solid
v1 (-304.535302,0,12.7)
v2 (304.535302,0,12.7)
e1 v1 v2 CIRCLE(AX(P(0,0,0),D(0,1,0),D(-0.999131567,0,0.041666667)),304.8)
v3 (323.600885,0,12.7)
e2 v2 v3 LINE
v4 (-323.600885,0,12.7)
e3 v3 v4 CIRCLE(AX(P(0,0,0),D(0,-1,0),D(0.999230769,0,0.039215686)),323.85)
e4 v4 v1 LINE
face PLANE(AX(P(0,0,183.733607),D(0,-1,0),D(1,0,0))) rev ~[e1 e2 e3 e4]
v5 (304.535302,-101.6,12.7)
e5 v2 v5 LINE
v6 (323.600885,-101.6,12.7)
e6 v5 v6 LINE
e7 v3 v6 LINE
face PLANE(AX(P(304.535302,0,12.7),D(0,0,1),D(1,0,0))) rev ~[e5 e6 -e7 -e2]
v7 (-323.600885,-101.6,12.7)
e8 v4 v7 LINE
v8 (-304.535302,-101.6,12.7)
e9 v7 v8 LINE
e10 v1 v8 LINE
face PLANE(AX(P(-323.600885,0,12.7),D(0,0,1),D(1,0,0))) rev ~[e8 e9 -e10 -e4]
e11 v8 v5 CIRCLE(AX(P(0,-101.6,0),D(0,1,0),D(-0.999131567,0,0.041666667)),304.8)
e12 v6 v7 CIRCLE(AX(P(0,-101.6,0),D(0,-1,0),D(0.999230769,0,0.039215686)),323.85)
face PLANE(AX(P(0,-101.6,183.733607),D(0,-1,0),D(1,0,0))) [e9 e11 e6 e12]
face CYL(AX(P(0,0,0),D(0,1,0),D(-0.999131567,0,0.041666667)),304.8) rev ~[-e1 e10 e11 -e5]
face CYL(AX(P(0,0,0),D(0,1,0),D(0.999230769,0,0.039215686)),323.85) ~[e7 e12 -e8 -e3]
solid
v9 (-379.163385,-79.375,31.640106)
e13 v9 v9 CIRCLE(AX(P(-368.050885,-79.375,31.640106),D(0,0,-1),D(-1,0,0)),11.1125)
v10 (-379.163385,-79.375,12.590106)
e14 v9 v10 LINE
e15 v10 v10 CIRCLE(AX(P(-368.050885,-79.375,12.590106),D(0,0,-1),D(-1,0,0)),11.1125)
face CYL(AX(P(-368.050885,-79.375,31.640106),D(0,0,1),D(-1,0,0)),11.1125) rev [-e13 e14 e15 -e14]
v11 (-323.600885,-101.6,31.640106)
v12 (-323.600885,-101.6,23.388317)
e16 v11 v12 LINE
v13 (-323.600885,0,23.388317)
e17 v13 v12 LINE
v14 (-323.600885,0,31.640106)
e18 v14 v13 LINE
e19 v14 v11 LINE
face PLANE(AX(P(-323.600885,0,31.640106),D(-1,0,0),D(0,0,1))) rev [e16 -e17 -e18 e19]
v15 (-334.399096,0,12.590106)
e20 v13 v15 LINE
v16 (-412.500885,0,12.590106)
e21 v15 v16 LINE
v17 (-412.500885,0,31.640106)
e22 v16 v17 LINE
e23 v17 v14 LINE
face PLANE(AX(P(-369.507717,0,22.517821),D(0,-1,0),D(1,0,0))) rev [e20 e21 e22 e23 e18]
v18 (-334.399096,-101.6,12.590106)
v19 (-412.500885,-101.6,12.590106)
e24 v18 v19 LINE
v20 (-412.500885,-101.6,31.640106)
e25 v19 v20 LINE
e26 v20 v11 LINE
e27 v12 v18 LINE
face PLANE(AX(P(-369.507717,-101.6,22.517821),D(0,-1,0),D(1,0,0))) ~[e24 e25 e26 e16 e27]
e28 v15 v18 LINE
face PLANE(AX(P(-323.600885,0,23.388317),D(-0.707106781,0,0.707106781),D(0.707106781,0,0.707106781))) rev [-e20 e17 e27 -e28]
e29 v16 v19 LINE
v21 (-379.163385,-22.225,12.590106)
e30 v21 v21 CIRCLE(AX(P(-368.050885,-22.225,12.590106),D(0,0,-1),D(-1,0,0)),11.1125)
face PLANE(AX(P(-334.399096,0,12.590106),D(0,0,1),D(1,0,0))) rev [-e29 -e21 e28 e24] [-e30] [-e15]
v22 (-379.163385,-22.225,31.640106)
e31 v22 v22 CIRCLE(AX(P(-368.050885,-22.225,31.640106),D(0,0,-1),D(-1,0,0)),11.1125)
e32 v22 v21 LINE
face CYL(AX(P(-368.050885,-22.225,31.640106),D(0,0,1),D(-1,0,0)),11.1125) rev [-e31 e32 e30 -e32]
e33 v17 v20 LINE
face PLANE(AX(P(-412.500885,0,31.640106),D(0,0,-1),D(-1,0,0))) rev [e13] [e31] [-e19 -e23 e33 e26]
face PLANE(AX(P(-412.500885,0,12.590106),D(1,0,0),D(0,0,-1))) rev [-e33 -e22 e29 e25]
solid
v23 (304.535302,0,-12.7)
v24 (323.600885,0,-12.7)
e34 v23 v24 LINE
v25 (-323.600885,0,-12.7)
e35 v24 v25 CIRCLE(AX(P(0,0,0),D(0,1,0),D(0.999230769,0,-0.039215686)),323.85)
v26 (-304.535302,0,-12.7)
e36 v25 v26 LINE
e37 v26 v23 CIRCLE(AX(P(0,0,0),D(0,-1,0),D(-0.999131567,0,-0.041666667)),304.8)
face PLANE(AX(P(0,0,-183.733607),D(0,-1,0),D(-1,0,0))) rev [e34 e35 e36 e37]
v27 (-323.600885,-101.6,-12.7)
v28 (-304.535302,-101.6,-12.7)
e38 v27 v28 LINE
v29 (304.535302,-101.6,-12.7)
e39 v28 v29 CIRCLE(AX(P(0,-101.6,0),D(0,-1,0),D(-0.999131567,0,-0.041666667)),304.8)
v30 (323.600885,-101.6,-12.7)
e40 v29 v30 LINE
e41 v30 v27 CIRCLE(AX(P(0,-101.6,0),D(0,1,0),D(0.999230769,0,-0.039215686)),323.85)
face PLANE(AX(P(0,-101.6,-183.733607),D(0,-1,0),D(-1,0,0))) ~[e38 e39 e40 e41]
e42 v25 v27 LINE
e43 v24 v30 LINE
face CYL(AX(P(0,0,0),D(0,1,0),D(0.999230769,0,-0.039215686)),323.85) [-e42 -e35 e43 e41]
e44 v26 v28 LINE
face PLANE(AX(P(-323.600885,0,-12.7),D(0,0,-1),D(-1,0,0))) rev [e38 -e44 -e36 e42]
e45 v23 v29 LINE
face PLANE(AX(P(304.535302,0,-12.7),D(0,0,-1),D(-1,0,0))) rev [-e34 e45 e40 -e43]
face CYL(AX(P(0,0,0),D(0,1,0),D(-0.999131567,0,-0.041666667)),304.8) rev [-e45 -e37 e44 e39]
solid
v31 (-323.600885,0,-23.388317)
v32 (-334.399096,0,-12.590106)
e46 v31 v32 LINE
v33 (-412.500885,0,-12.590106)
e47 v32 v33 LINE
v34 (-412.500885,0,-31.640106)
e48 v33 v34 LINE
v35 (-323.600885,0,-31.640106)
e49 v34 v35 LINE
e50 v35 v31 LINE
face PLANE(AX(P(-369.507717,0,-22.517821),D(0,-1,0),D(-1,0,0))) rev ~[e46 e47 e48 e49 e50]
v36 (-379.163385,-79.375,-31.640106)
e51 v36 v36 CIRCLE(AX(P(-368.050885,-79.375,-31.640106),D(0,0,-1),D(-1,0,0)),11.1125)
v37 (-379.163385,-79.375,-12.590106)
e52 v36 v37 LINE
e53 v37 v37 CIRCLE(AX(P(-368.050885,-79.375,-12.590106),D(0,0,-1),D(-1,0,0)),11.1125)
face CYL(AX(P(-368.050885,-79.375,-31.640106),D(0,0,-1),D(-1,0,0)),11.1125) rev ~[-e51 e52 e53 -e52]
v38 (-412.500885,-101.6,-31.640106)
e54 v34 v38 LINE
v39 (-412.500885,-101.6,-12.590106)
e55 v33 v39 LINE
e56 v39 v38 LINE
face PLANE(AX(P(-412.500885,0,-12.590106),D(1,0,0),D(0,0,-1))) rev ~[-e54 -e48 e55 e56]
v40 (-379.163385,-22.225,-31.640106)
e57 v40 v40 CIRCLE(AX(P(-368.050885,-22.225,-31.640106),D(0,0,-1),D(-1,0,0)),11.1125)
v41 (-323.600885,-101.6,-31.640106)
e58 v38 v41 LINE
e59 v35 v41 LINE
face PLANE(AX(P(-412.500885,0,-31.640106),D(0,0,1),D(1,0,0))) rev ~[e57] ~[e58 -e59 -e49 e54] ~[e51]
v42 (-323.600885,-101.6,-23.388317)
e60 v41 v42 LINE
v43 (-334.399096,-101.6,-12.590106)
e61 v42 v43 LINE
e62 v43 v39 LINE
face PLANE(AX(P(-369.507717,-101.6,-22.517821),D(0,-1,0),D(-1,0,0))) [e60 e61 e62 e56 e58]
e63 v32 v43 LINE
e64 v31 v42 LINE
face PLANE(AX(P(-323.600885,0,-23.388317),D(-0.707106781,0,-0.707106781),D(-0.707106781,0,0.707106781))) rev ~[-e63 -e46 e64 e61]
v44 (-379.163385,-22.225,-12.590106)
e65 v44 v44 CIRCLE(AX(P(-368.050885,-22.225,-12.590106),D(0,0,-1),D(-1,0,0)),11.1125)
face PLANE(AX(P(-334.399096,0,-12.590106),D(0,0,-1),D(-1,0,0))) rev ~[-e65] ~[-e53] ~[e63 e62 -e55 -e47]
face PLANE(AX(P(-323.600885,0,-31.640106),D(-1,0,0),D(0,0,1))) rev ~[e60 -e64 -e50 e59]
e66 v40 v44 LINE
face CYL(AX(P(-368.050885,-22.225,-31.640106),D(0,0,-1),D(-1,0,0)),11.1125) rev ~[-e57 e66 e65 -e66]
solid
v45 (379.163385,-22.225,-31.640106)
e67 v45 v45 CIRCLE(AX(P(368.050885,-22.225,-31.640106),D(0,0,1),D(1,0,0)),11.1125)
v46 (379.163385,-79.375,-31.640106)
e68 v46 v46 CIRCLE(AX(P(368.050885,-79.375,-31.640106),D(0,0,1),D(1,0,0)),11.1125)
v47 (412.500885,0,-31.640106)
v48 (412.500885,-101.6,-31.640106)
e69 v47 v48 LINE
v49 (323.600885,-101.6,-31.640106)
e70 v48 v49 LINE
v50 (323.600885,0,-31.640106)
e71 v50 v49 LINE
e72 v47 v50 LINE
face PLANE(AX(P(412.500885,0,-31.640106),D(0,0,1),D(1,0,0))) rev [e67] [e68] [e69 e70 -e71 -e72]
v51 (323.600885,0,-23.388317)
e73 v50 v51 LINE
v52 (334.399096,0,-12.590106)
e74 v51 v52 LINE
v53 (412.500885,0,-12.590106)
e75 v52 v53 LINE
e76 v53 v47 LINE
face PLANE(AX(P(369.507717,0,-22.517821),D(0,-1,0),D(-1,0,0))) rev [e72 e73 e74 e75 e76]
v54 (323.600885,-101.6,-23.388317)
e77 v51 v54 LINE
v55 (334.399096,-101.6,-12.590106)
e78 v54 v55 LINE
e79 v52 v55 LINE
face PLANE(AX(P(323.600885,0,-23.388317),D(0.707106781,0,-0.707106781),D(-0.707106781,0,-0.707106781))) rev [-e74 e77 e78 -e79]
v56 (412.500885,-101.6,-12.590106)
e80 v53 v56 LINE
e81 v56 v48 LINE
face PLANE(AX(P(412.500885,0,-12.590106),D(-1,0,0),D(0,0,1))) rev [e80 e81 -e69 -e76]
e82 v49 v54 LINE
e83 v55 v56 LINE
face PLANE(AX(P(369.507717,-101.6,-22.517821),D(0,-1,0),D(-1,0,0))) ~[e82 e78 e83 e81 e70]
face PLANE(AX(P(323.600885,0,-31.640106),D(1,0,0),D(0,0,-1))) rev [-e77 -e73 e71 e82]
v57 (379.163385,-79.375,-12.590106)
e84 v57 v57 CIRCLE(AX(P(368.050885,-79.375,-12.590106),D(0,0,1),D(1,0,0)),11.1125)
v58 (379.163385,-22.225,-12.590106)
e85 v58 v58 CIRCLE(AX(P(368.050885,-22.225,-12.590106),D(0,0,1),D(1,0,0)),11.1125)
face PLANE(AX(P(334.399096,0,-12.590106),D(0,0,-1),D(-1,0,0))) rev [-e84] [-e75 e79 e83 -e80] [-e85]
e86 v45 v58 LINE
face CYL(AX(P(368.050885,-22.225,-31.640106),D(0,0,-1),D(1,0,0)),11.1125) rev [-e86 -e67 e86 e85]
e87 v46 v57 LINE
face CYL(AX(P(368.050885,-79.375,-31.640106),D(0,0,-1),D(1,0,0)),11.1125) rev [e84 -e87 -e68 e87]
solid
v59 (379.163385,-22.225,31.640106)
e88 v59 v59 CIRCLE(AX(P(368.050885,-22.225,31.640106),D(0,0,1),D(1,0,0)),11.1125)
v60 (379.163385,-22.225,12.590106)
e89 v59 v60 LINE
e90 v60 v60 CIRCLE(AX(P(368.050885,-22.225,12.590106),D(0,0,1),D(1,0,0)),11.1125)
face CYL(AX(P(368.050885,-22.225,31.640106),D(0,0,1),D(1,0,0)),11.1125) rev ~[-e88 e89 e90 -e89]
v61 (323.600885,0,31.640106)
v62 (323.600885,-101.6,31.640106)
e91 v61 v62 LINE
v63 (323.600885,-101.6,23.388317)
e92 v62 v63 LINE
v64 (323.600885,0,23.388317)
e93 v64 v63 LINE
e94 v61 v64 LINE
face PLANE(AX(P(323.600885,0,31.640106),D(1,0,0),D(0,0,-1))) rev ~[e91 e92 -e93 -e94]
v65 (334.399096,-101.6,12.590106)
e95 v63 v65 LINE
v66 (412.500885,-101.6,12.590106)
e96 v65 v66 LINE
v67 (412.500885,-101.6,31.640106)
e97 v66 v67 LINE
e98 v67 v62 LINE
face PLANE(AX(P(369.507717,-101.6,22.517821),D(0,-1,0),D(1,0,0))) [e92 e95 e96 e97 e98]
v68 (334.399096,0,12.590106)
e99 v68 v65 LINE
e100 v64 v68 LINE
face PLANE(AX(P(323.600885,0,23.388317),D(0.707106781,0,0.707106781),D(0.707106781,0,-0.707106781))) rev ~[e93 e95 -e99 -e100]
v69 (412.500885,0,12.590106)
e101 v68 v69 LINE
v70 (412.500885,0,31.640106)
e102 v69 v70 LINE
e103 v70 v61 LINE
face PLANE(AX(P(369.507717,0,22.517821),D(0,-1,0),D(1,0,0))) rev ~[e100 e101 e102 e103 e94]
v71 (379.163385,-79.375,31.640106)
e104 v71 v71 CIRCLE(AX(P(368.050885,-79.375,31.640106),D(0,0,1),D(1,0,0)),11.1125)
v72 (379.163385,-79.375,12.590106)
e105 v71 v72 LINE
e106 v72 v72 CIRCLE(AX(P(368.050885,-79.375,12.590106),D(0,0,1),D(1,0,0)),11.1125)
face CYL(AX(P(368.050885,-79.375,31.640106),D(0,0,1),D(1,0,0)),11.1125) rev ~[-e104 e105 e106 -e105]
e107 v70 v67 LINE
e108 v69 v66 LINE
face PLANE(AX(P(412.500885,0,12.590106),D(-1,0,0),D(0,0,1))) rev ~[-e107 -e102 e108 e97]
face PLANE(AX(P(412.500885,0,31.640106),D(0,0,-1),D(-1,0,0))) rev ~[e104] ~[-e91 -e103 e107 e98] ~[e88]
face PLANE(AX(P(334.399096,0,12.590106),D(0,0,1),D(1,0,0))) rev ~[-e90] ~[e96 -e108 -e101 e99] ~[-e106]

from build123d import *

# Parameters (mm, degrees)
F1_DEPTH = 101.6
F5_DEPTH = 101.6
F6_R     = 11.1125
F7_DEPTH = 25.4


# Not quite as in the source:
# - a feature of the source that left no trace in its solid (it failed there, or was rolled back) is left out


with BuildPart() as f1:
    # F0 (on Front) → F1 (new body)
    with BuildSketch(Plane.XZ):
        with BuildLine():
            ThreePointArc((-304.5353017304, 12.7), (0, 304.8), (304.5353017304, 12.7))
            Line((304.5353017304, 12.7), (323.6008845785, 12.7))
            ThreePointArc((323.6008845785, 12.7), (0, 323.85), (-323.6008845785, 12.7))
            Line((-323.6008845785, 12.7), (-304.5353017304, 12.7))
        make_face()
    extrude(amount=F1_DEPTH)


with BuildPart() as f2_1:
    # F2: instance of F1
    add(f1.part.mirror(Plane.XY))


with BuildPart() as f5:
    # F3 (on Front) → F5 (new body)
    with BuildSketch(Plane.XZ):
        Polygon((323.6008845785, 31.6401058242), (323.6008845785, 23.3883168548), (334.3990956091, 12.5901058242), (412.5008845785, 12.5901058242), (412.5008845785, 31.6401058242), align=None)
    extrude(amount=F5_DEPTH)

    # F6 (on face) → F7 (cut)
    with BuildSketch(Plane.XY.offset(31.6401058242)):
        with Locations((368.0508845785, -22.225)):
            Circle(F6_R)
        with Locations((368.0508845785, -79.375)):
            Circle(F6_R)
    extrude(amount=-F7_DEPTH, mode=Mode.SUBTRACT)


with BuildPart() as f8_1:
    # F8: instance of F5
    add(f5.part.mirror(Plane.YZ))


with BuildPart() as f9_1:
    # F9: instance of F8_1
    add(f8_1.part.mirror(Plane.XY))


with BuildPart() as f9_2:
    # F9: instance of F5
    add(f5.part.mirror(Plane.XY))


solid = Compound([f1.part, f2_1.part, f5.part, f8_1.part, f9_1.part, f9_2.part])
